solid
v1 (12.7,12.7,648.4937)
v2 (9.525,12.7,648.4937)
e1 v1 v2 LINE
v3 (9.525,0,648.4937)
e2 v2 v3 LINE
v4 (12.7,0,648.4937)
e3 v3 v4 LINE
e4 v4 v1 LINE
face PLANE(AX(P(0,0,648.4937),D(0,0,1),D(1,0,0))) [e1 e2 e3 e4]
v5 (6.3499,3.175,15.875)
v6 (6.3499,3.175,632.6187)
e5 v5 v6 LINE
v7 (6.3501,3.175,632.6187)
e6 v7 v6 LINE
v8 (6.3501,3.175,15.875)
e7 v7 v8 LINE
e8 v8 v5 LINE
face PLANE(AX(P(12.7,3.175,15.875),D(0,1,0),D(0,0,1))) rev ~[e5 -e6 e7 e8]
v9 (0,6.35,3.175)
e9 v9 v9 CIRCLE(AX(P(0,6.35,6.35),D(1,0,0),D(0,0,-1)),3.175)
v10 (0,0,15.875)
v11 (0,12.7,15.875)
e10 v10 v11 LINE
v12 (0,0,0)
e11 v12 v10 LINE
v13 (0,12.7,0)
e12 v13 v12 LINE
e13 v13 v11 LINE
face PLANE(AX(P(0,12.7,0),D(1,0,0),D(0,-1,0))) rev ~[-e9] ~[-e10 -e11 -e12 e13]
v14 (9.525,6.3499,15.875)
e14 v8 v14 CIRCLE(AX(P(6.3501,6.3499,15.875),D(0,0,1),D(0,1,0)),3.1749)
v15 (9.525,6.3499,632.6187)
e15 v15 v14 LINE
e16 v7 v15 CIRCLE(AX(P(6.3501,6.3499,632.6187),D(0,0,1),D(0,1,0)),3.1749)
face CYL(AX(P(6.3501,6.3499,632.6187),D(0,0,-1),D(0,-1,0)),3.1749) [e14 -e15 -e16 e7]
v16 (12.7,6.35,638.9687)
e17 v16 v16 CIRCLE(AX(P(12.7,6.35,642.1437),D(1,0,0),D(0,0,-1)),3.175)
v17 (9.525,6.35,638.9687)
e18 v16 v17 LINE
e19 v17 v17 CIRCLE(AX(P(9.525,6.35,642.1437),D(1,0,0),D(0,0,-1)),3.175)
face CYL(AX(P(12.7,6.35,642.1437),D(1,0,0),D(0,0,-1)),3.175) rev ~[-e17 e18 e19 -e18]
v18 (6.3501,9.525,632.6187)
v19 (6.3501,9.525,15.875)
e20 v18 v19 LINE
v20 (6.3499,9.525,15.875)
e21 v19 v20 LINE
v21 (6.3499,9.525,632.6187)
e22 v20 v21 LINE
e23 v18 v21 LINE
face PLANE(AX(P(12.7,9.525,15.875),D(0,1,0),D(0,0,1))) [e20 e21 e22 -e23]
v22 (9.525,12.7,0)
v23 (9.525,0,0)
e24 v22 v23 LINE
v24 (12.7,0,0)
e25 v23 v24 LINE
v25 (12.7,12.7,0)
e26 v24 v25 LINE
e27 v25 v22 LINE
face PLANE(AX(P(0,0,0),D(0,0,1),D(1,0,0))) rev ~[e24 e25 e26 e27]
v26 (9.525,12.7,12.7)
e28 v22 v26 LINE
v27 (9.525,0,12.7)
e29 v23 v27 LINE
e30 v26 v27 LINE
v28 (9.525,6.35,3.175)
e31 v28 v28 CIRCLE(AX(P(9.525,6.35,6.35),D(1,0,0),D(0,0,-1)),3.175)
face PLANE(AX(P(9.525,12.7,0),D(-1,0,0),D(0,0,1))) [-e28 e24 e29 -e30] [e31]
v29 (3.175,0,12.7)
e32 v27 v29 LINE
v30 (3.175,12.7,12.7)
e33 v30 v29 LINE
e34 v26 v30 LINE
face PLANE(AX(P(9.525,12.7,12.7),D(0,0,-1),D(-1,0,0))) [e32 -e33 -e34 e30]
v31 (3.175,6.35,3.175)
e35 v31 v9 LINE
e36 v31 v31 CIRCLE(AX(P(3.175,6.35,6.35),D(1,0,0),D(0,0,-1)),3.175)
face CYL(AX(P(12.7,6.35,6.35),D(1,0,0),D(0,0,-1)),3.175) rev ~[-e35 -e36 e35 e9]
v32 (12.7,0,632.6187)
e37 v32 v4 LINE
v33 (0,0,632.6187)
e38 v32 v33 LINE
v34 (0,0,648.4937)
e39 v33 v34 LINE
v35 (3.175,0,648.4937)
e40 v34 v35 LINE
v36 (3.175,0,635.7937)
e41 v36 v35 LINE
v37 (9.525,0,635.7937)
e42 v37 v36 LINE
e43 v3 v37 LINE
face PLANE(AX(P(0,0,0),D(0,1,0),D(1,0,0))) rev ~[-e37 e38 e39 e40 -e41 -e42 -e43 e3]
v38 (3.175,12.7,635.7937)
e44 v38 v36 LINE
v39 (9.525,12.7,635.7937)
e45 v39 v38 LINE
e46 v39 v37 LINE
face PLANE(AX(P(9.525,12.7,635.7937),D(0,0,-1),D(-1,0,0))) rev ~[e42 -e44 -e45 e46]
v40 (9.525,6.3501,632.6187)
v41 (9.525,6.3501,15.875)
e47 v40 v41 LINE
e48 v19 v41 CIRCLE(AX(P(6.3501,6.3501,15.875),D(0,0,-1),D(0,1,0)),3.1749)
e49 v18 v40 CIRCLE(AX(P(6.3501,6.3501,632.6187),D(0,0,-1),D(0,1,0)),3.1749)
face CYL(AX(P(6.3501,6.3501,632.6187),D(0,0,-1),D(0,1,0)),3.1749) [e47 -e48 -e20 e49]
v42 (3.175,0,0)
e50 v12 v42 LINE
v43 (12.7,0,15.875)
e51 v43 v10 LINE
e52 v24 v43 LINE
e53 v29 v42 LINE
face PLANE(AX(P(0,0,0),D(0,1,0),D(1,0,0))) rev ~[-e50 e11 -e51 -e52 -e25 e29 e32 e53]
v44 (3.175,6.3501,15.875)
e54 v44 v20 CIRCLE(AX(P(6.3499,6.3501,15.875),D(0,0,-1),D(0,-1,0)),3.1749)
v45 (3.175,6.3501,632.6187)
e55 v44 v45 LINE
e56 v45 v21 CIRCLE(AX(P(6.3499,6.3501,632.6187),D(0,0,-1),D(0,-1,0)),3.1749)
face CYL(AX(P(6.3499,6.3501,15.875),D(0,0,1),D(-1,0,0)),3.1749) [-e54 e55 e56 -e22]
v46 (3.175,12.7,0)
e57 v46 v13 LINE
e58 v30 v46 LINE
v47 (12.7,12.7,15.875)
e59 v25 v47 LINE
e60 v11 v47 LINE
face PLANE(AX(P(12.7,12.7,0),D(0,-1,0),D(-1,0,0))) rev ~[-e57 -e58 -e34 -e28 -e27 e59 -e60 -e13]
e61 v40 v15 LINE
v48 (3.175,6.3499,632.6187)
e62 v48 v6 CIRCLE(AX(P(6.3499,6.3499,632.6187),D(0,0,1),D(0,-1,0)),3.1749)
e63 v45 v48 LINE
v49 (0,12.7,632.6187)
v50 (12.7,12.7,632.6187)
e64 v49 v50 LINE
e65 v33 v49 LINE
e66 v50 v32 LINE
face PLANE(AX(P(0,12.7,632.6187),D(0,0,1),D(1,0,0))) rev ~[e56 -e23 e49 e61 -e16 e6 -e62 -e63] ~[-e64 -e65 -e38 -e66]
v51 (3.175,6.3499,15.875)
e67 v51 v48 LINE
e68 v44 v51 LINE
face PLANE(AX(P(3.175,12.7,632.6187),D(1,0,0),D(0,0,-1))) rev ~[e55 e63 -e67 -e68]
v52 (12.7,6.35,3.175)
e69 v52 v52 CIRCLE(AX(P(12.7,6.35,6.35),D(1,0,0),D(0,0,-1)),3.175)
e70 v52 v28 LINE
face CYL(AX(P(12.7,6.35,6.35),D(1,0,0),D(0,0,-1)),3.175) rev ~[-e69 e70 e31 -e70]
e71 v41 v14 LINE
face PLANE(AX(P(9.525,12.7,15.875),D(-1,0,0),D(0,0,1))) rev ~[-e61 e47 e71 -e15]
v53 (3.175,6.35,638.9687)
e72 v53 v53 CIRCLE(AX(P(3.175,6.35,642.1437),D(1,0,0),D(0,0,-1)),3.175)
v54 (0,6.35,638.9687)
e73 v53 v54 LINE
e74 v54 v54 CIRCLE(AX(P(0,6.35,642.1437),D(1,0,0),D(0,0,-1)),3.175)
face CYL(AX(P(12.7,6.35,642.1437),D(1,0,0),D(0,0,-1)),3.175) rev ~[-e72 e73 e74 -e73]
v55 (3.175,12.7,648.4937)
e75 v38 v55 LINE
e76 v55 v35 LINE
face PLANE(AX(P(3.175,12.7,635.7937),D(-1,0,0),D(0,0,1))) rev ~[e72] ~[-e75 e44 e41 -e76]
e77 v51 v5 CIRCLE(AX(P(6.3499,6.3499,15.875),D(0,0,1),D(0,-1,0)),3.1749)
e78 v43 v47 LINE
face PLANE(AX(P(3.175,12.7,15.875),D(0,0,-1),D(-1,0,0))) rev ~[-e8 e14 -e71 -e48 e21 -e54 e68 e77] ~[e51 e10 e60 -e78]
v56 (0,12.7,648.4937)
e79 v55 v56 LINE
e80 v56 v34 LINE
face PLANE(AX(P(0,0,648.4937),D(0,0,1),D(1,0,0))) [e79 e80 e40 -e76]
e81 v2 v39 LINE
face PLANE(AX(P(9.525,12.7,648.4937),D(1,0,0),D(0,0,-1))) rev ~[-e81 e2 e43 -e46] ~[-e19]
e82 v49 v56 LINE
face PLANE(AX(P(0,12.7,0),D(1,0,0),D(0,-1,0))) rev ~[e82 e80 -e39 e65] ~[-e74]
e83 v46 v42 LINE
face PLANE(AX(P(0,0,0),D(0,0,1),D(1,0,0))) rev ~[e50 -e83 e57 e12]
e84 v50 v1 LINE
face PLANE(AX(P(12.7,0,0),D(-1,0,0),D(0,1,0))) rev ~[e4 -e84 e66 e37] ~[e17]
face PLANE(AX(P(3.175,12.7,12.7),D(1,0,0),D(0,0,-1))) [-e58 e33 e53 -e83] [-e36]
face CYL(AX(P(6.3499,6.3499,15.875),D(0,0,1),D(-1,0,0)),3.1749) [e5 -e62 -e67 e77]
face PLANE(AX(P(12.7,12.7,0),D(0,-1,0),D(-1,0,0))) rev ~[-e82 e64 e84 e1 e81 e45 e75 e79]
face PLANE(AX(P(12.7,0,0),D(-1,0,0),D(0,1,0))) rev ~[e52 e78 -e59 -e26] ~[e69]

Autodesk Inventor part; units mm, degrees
ref_plane "YZ Plane" through (0, 0, 0) normal (1, 0, 0) x (0, 1, 0)
ref_plane "XZ Plane" through (0, 0, 0) normal (0, 1, 0) x (-1, 0, 0)
ref_plane "XY Plane" through (0, 0, 0) normal (0, 0, 1) x (1, 0, 0)
sketch "Sketch1" plane through (0, 0, 0) normal (0, 0, 1) x (1, 0, 0)
  line L0 (0, 0) -> (12.7, 0)
  line L1 (12.7, 0) -> (12.7, 12.7)
  line L2 (12.7, 12.7) -> (0, 12.7)
  line L3 (0, 12.7) -> (0, 0)
  dimension "d0" = 12.7
  dimension "d1" = 12.7
extrude "Extrusion1" add sketch "Sketch1" along normal blind 648.4937
sketch "Sketch2" plane through (12.7, 12.7, 648.4937) normal (0, 1, 0) x (1, 0, 0)
  line L0 (-12.7, 0) -> (0, 0) projected
  line L1 (0, 648.4937) -> (0, 0) projected
  line L2 (0, 648.4937) -> (-12.7, 648.4937) projected
  line L3 (-12.7, 648.4937) -> (-12.7, 0) projected
  line L4 (-12.7, 15.875) -> (-9.525, 15.875)
  line L5 (-9.525, 15.875) -> (-9.525, 632.6187)
  line L6 (-9.525, 632.6187) -> (-12.7, 632.6187)
  line L7 (-12.7, 632.6187) -> (-12.7, 15.875)
  line L8 (0, 632.6187) -> (-3.175, 632.6187)
  line L9 (-3.175, 632.6187) -> (-3.175, 15.875)
  line L10 (-3.175, 15.875) -> (0, 15.875)
  line L11 (0, 15.875) -> (0, 632.6187)
  line L12 (-9.525, 648.4937) -> (-3.175, 648.4937)
  line L13 (-3.175, 648.4937) -> (-3.175, 635.7937)
  line L14 (-3.175, 635.7937) -> (-9.525, 635.7937)
  line L15 (-9.525, 635.7937) -> (-9.525, 648.4937)
  line L16 (-9.525, 0) -> (-3.175, 0)
  line L17 (-3.175, 0) -> (-3.175, 12.7)
  line L18 (-3.175, 12.7) -> (-9.525, 12.7)
  line L19 (-9.525, 12.7) -> (-9.525, 0)
  dimension "d4" = 15.875
  dimension "d5" = 6.35
  dimension "d6" = 15.875
  dimension "d7" = 12.7
  dimension "d8" = 12.7
extrude "Extrusion2" cut sketch "Sketch2" against normal through all contours L19 L18 L17 L0 | L3 L6 L5 L4 | L10 L9 L8 L1 | L2 L13 L14 L15
sketch "Sketch3" plane through (12.7, 0, 648.4937) normal (1, 0, 0) x (0, 0, -1)
  line L0 (15.875, 12.7) -> (0, 12.7) projected
  line L1 (0, 12.7) -> (0, 0) projected
  line L2 (632.6187, 12.7) -> (632.6187, 0) projected
  line L3 (648.4937, 0) -> (632.6187, 0) projected
  line L4 (648.4937, 0) -> (648.4937, 12.7) projected
  line L5 (648.4937, 12.7) -> (632.6187, 12.7) projected
  line L6 (632.6187, 0) -> (15.875, 0) projected
  line L7 (632.6187, 12.7) -> (632.6187, 0) projected
  line L8 (15.875, 12.7) -> (632.6187, 12.7) projected
  line L9 (15.875, 12.7) -> (15.875, 0) projected
  line L10 (15.875, 12.7) -> (632.6187, 12.7)
  line L11 (632.6187, 12.7) -> (632.6187, 9.525)
  line L12 (632.6187, 9.525) -> (15.875, 9.525)
  line L13 (15.875, 9.525) -> (15.875, 12.7)
  line L14 (632.6187, 3.175) -> (15.875, 3.175)
  line L15 (15.875, 3.175) -> (15.875, 0)
  line L16 (15.875, 0) -> (632.6187, 0)
  line L17 (632.6187, 0) -> (632.6187, 3.175)
  circle A0 centre (6.35, 6.35) radius 3.175
  circle A1 centre (642.1437, 6.35) radius 3.175
  point P0 (648.4937, 0)
  dimension "d11" = 6.35
  dimension "d12" = 6.35
  dimension "d13" = 6.35
  dimension "d14" = 6.35
  dimension "d15" = 3.175
  dimension "d16" = 6.35
  dimension "d17" = 6.35
  dimension "d18" = 6.35
extrude "Extrusion3" cut sketch "Sketch3" against normal through all contours L2 L12 L9 L8 | L2 L6 L9 L14 | A0 | A1
fillet "Fillet1" radius 3.175 4 edges at (9.525, 9.525, 324.2469) (3.175, 9.525, 324.2469) (3.175, 3.175, 324.2469) (9.525, 3.175, 324.2469)
equation "\"d1\" = d0"
equation "\"d13\" = d12"
equation "\"d17\" = d16"
equation "\"d18\" = d17"
properties part number "manipulator piston"
